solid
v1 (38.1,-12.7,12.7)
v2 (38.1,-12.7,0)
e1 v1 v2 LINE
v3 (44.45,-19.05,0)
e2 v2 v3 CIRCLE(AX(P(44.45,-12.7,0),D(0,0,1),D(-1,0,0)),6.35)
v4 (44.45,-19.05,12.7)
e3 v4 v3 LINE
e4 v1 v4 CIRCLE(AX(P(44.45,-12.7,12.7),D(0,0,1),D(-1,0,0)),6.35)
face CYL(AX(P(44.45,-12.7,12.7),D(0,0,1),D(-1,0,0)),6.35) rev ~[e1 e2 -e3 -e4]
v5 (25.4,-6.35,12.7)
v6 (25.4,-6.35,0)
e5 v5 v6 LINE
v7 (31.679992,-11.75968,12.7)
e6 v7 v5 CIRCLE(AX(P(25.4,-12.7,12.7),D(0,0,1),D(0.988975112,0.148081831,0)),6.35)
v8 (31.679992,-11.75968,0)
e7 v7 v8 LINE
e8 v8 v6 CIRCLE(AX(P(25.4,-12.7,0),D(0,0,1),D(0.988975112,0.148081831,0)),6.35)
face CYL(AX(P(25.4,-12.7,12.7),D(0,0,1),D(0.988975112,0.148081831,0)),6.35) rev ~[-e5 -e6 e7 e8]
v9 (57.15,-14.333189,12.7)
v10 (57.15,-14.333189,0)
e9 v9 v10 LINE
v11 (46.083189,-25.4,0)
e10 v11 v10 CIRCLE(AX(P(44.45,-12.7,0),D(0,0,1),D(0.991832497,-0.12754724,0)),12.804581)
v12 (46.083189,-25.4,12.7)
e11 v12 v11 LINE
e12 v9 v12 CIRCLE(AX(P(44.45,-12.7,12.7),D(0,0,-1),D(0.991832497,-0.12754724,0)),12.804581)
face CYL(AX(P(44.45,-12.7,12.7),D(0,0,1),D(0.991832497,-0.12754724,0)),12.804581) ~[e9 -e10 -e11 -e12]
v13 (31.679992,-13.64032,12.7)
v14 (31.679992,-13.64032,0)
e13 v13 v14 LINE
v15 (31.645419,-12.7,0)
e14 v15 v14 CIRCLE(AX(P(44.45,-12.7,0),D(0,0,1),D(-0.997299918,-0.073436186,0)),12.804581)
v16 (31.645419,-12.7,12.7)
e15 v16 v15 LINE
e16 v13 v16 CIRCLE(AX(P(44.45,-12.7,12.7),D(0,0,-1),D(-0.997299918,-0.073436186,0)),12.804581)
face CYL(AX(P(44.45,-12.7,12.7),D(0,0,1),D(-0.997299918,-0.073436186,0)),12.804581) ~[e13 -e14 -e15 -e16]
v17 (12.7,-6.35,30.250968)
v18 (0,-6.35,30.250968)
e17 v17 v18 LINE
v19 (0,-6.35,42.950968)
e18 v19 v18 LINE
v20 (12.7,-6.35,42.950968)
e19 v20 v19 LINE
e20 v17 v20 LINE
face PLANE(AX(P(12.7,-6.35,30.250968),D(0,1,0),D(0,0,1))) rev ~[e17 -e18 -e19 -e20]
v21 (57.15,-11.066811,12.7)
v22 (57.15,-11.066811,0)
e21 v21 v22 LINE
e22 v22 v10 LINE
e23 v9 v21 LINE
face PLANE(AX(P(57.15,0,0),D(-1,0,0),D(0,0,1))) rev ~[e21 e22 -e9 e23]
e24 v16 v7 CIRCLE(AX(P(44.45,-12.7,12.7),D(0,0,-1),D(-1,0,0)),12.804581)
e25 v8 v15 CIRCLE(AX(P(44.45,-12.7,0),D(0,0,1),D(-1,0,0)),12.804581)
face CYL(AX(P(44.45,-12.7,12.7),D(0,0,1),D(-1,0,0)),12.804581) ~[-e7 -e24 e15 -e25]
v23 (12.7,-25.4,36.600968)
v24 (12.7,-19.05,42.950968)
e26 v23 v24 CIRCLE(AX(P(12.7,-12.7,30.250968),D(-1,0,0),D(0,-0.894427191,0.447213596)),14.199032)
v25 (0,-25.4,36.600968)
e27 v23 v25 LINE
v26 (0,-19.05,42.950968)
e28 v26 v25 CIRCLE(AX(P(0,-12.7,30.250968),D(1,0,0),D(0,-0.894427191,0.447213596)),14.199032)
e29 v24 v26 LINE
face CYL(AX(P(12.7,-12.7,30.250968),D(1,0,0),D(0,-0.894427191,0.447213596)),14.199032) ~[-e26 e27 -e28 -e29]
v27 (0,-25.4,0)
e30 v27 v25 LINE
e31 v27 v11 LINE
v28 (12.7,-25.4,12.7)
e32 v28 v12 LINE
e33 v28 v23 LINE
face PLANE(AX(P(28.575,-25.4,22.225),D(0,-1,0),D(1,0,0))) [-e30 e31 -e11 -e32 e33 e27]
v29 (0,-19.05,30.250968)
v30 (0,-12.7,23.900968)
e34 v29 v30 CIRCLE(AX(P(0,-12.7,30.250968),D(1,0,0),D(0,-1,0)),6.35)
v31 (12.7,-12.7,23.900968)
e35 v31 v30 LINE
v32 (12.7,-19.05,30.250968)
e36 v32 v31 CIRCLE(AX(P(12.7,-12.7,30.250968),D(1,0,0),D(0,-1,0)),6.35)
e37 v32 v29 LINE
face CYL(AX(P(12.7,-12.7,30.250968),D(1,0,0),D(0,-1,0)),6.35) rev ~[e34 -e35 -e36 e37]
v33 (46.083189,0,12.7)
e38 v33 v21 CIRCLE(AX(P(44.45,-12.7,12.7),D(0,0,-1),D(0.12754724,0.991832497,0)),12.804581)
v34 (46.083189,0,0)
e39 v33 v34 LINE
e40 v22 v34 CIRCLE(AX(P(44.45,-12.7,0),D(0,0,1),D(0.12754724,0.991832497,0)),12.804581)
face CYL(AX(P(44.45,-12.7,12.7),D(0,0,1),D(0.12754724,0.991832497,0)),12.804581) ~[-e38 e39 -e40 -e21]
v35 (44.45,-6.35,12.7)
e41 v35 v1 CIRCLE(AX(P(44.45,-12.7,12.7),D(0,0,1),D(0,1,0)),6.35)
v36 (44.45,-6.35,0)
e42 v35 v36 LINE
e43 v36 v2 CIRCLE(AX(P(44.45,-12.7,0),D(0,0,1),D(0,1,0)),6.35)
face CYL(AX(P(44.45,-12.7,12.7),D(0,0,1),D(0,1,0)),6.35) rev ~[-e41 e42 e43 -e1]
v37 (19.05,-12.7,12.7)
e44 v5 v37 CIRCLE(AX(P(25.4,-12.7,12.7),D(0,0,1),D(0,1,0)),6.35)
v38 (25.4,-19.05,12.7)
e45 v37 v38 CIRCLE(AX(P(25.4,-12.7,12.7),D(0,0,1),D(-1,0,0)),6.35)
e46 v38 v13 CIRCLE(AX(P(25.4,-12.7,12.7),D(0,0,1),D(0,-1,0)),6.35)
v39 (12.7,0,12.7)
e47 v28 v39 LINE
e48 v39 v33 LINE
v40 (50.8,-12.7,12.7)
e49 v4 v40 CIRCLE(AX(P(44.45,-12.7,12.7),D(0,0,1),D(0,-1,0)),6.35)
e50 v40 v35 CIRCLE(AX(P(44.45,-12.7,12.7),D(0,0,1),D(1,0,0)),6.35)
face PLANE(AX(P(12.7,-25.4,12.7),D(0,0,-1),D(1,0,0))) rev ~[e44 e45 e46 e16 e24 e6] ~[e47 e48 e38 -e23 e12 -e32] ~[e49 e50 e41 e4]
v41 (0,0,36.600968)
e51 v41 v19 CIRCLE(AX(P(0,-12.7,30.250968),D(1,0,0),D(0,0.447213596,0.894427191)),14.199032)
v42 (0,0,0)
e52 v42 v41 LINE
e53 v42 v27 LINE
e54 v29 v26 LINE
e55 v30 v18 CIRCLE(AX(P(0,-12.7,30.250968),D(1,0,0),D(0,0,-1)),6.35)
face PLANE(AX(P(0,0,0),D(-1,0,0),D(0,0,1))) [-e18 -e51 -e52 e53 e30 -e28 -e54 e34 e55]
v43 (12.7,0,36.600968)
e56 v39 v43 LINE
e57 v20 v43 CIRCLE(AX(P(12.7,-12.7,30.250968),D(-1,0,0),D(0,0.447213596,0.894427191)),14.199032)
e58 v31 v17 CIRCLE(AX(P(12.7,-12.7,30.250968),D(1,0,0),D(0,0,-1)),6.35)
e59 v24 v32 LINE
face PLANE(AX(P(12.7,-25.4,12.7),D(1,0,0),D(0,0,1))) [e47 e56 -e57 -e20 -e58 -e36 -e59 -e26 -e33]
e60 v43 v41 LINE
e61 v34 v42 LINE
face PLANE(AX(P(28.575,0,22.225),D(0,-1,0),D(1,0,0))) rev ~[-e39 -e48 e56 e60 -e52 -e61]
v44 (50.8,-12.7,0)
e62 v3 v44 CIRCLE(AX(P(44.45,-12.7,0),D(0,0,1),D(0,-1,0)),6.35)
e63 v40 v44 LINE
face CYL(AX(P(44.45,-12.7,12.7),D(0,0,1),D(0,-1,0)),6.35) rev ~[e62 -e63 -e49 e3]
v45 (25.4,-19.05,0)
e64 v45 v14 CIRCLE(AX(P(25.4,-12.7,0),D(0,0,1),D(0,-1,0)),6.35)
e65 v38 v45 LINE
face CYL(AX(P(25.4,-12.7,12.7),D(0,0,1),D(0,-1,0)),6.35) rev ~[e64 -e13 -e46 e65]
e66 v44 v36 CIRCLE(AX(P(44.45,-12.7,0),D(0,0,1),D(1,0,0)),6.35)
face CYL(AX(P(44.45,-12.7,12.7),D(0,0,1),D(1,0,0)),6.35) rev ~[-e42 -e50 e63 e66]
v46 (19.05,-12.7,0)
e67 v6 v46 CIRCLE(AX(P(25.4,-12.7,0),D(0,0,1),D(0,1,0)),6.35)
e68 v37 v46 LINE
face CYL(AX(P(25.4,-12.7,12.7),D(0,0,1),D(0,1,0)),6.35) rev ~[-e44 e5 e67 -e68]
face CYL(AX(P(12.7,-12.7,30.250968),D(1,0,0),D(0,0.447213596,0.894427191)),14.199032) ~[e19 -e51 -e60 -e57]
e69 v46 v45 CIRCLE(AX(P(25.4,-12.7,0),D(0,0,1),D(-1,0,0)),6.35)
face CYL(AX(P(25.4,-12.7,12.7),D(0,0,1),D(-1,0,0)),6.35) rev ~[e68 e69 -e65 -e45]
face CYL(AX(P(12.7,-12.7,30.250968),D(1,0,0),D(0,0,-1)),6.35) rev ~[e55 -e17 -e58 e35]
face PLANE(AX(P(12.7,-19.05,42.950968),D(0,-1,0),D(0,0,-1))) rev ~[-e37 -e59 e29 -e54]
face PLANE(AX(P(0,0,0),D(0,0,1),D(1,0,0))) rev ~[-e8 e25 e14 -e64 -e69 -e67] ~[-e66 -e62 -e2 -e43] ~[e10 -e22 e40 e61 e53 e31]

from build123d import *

# Parameters (mm, degrees)
F0_W     = 57.15
F0_H     = 44.45
F1_DEPTH = 25.4
F2_W     = 44.45
F2_H     = 31.75
F3_DEPTH = 25.4
F5_DEPTH = 25.4
F7_DEPTH = 25.4


with BuildPart() as f1:
    # F0 (on Front) → F1 (new body)
    with BuildSketch(Plane.XZ):
        with Locations((28.575, 22.225)):
            Rectangle(F0_W, F0_H)
    extrude(amount=F1_DEPTH)

    # F2 (on face) → F3 (cut)
    with BuildSketch(Plane.XZ.offset(25.4)):
        with Locations((34.925, 28.575)):
            Rectangle(F2_W, F2_H)
    extrude(amount=-F3_DEPTH, mode=Mode.SUBTRACT)

    # F4 (on face) → F5 (cut)
    with BuildSketch(Plane.YZ.offset(12.7)):
        with BuildLine():
            ThreePointArc((-19.05, 42.9509683429), (-15.9622689922, 44.0701615546), (-12.7, 44.45))
            Line((-12.7, 44.45), (-25.4, 44.45))
            Line((-25.4, 44.45), (-25.4, 36.6009683429))
            ThreePointArc((-25.4, 36.6009683429), (-22.740231571, 40.2911999139), (-19.05, 42.9509683429))
        make_face()
        with BuildLine():
            Line((0, 44.45), (-12.7, 44.45))
            ThreePointArc((-12.7, 44.45), (-9.4377310078, 44.0701615546), (-6.35, 42.9509683429))
            ThreePointArc((-6.35, 42.9509683429), (-2.659768429, 40.2911999139), (0, 36.6009683429))
            Line((0, 36.6009683429), (0, 44.45))
        make_face()
        with BuildLine():
            Line((-12.7, 36.6009683429), (-12.7, 44.45))
            ThreePointArc((-12.7, 44.45), (-15.9622689922, 44.0701615546), (-19.05, 42.9509683429))
            Line((-19.05, 42.9509683429), (-19.05, 30.2509683429))
            ThreePointArc((-19.05, 30.2509683429), (-17.1901280605, 34.7410964034), (-12.7, 36.6009683429))
        make_face()
        with BuildLine():
            ThreePointArc((-6.35, 42.9509683429), (-9.4377310078, 44.0701615546), (-12.7, 44.45))
            Line((-12.7, 44.45), (-12.7, 36.6009683429))
            ThreePointArc((-12.7, 36.6009683429), (-8.2098719395, 34.7410964034), (-6.35, 30.2509683429))
            Line((-6.35, 30.2509683429), (-6.35, 42.9509683429))
        make_face()
        with BuildLine():
            Line((-12.7, 23.9009683429), (-12.7, 30.2509683429))
            Line((-12.7, 30.2509683429), (-19.05, 30.2509683429))
            ThreePointArc((-19.05, 30.2509683429), (-17.1901280605, 25.7608402823), (-12.7, 23.9009683429))
        make_face()
        with BuildLine():
            Line((-12.7, 30.2509683429), (-12.7, 36.6009683429))
            ThreePointArc((-12.7, 36.6009683429), (-17.1901280605, 34.7410964034), (-19.05, 30.2509683429))
            Line((-19.05, 30.2509683429), (-12.7, 30.2509683429))
        make_face()
        with BuildLine():
            Line((-6.35, 30.2509683429), (-12.7, 30.2509683429))
            Line((-12.7, 30.2509683429), (-12.7, 23.9009683429))
            ThreePointArc((-12.7, 23.9009683429), (-8.2098719395, 25.7608402823), (-6.35, 30.2509683429))
        make_face()
        with BuildLine():
            ThreePointArc((-6.35, 30.2509683429), (-8.2098719395, 34.7410964034), (-12.7, 36.6009683429))
            Line((-12.7, 36.6009683429), (-12.7, 30.2509683429))
            Line((-12.7, 30.2509683429), (-6.35, 30.2509683429))
        make_face()
    extrude(amount=-F5_DEPTH, mode=Mode.SUBTRACT)

    # F6 (on face) → F7 (cut)
    with BuildSketch(Plane.XY.offset(12.7)):
        with BuildLine():
            ThreePointArc((31.6799919585, -11.7596803731), (29.5443618549, -7.8888915191), (25.4, -6.35))
            Line((25.4, -6.35), (25.4, -12.7))
            Line((25.4, -12.7), (31.6454185395, -12.7))
            ThreePointArc((31.6454185395, -12.7), (31.6540648134, -12.2295224974), (31.6799919585, -11.7596803731))
        make_face()
        with BuildLine():
            Line((25.4, -12.7), (25.4, -6.35))
            ThreePointArc((25.4, -6.35), (20.9098719395, -8.2098719395), (19.05, -12.7))
            Line((19.05, -12.7), (25.4, -12.7))
        make_face()
        with BuildLine():
            ThreePointArc((46.0831890214, 0), (44.45, 0.1045814605), (42.8168109786, 0))
            Line((42.8168109786, 0), (44.45, 0))
            Line((44.45, 0), (46.0831890214, 0))
        make_face()
        with BuildLine():
            Line((31.6454185395, -12.7), (25.4, -12.7))
            Line((25.4, -12.7), (25.4, -19.05))
            ThreePointArc((25.4, -19.05), (29.5443618549, -17.5111084809), (31.6799919585, -13.6403196269))
            ThreePointArc((31.6799919585, -13.6403196269), (31.6540648134, -13.1704775026), (31.6454185395, -12.7))
        make_face()
        with BuildLine():
            Line((25.4, -19.05), (25.4, -12.7))
            Line((25.4, -12.7), (19.05, -12.7))
            ThreePointArc((19.05, -12.7), (20.9098719395, -17.1901280605), (25.4, -19.05))
        make_face()
        with BuildLine():
            Line((57.15, 0), (46.0831890214, 0))
            ThreePointArc((46.0831890214, 0), (53.504206381, -3.645793619), (57.15, -11.0668109786))
            Line((57.15, -11.0668109786), (57.15, 0))
        make_face()
        with BuildLine():
            ThreePointArc((50.8, -12.7), (48.9401280605, -8.2098719395), (44.45, -6.35))
            Line((44.45, -6.35), (44.45, -12.7))
            Line((44.45, -12.7), (50.8, -12.7))
        make_face()
        with BuildLine():
            Line((44.45, -12.7), (44.45, -6.35))
            ThreePointArc((44.45, -6.35), (39.9598719395, -8.2098719395), (38.1, -12.7))
            Line((38.1, -12.7), (44.45, -12.7))
        make_face()
        with BuildLine():
            Line((44.45, -12.7), (38.1, -12.7))
            ThreePointArc((38.1, -12.7), (39.9598719395, -17.1901280605), (44.45, -19.05))
            Line((44.45, -19.05), (44.45, -12.7))
        make_face()
        with BuildLine():
            Line((50.8, -12.7), (44.45, -12.7))
            Line((44.45, -12.7), (44.45, -19.05))
            ThreePointArc((44.45, -19.05), (48.9401280605, -17.1901280605), (50.8, -12.7))
        make_face()
        with BuildLine():
            Line((57.15, -25.4), (57.15, -14.3331890214))
            ThreePointArc((57.15, -14.3331890214), (53.504206381, -21.754206381), (46.0831890214, -25.4))
            Line((46.0831890214, -25.4), (57.15, -25.4))
        make_face()
    extrude(amount=-F7_DEPTH, mode=Mode.SUBTRACT)


solid = f1.part
